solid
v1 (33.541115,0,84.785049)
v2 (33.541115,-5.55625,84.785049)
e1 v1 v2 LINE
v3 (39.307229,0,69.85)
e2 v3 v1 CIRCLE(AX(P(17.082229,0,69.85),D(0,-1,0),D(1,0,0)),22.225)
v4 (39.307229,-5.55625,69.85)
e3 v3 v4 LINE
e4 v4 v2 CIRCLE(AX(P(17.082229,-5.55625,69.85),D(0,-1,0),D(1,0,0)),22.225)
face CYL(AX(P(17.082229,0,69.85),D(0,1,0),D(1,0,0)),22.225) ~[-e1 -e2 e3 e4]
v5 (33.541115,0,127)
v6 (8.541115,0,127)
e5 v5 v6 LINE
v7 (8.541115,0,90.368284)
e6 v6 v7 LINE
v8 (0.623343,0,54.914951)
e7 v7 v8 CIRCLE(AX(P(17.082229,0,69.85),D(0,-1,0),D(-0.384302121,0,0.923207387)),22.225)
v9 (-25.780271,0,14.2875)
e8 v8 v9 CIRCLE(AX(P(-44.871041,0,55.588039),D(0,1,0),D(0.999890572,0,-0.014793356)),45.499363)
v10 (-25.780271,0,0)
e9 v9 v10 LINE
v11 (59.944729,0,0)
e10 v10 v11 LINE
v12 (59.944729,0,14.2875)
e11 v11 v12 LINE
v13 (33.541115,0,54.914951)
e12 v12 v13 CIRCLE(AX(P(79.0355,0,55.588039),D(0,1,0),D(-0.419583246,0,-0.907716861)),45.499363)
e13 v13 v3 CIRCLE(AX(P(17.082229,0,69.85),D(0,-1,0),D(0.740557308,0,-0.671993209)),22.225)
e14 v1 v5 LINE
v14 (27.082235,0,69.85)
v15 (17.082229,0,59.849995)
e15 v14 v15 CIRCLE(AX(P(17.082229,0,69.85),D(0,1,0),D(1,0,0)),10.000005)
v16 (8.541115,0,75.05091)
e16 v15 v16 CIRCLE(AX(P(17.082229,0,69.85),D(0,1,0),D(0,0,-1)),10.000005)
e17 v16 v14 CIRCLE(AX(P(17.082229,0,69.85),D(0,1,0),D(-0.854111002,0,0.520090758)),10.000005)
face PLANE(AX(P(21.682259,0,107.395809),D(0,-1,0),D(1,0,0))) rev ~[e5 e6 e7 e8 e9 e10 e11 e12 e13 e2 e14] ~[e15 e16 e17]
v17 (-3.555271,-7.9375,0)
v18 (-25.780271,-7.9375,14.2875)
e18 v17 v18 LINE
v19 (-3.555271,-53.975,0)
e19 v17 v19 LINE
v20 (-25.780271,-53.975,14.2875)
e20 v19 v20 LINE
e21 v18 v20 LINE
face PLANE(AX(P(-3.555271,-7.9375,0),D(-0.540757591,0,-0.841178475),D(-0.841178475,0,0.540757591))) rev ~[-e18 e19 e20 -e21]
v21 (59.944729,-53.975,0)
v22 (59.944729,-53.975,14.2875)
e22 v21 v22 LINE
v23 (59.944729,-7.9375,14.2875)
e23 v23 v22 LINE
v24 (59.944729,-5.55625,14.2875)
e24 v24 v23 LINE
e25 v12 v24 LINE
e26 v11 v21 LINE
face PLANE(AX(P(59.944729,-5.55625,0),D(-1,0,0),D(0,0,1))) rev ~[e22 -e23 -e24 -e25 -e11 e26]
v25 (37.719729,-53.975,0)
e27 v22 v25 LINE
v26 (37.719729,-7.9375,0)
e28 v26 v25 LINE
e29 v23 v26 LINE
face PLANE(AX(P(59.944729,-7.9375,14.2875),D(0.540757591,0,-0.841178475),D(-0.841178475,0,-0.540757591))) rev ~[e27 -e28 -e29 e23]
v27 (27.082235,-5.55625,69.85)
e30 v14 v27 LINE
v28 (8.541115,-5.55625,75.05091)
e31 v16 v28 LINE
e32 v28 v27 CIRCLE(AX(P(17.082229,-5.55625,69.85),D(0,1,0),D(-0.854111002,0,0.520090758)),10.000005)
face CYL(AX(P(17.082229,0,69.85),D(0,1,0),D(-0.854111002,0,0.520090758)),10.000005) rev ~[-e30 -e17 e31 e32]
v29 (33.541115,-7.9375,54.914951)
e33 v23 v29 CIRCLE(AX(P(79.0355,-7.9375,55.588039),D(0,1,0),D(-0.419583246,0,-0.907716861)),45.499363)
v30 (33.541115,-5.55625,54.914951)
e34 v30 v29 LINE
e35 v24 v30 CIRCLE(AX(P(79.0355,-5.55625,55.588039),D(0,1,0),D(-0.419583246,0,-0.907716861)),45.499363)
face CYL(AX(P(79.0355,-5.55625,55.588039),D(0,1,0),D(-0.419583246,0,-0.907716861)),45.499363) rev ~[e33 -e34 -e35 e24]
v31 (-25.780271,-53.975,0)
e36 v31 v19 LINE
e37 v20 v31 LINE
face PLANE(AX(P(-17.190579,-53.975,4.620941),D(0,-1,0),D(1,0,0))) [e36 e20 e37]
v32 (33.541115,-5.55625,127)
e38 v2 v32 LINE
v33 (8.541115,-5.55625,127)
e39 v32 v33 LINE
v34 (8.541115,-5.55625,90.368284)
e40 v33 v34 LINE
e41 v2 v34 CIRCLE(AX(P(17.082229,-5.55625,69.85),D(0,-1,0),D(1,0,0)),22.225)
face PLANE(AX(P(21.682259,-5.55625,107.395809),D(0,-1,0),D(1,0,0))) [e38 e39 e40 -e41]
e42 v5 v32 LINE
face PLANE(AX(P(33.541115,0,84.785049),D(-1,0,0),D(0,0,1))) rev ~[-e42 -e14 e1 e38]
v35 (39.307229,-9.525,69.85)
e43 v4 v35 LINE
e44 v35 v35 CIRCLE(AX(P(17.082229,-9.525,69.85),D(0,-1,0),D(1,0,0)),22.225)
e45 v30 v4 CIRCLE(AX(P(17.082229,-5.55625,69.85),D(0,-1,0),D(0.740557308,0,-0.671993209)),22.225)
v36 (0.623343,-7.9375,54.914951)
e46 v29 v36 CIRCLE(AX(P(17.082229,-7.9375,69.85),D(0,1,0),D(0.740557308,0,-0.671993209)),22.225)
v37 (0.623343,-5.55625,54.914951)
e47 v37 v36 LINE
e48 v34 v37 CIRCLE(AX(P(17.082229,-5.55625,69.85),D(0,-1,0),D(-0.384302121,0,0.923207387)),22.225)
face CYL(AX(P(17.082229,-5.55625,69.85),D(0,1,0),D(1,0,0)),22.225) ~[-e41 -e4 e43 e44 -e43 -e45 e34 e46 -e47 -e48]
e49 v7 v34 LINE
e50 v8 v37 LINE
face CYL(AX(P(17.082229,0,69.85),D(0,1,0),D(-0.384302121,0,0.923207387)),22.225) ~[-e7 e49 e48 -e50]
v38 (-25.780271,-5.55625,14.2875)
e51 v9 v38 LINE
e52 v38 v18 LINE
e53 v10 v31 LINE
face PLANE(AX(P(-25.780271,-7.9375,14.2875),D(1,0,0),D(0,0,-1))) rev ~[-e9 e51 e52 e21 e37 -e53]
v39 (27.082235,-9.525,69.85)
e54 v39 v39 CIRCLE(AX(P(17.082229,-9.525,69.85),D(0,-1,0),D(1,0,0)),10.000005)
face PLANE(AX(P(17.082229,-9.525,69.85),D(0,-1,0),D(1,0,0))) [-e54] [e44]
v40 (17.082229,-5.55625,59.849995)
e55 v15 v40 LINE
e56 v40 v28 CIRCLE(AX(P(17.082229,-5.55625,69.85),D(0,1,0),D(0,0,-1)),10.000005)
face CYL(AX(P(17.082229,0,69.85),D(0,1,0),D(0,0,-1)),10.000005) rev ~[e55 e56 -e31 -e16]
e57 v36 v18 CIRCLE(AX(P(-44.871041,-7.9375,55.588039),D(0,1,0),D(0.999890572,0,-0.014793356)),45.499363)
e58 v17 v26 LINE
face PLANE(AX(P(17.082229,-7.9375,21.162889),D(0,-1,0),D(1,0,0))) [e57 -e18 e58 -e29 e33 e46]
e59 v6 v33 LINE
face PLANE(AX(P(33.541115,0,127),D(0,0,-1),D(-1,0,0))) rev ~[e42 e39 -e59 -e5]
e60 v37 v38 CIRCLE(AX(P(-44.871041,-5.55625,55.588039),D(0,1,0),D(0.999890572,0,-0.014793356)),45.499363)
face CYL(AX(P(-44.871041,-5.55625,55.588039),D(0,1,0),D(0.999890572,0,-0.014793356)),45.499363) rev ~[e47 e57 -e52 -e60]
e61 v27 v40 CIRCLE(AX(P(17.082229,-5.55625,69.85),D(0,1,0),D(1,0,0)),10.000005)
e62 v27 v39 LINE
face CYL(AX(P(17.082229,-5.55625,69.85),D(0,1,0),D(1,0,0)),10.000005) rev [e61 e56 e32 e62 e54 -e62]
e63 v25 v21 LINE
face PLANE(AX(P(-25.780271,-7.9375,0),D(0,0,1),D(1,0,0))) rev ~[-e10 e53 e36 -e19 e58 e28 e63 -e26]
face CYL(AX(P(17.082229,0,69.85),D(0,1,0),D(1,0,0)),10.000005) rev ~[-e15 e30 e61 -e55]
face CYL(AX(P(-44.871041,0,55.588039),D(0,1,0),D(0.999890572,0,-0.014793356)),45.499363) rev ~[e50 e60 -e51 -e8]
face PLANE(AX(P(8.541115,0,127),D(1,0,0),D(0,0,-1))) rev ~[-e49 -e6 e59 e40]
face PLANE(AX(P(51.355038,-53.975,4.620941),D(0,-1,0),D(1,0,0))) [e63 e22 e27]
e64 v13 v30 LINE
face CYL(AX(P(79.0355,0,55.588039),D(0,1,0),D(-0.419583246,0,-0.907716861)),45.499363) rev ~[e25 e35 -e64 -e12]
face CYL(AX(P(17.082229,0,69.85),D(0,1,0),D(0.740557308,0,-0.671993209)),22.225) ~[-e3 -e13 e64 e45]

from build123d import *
from build123d import SkipClean  # not in build123d's __all__

# Parameters (mm, degrees)
F1_DEPTH = 5.55625
F2_R     = 22.225
F2_R_2   = 10.0000054
F3_DEPTH = 3.96875
F5_DEPTH = 2.38125
F7_DEPTH = 46.0375


# Not quite as in the source:
# - after a boolean that leaves OpenCascade's solid faulty, fix() repairs it


with BuildPart() as f1:
    # F0 (on Front) → F1 (new body)
    with BuildSketch(Plane.XZ):
        with BuildLine():
            ThreePointArc((8.5411146283, 90.3682841852), (21.9263912189, 91.5406597383), (33.5411154283, 84.7850490788))
            Line((33.5411154283, 84.7850490788), (33.5411154283, 127))
            Line((33.5411154283, 127), (8.5411146283, 127))
            Line((8.5411146283, 127), (8.5411146283, 90.3682841852))
        make_face()
        with BuildLine():
            ThreePointArc((17.0822292566, 47.625), (26.0827614415, 49.5290491023), (33.5411154283, 54.9149509212))
            Line((33.5411154283, 54.9149509212), (33.5411154283, 84.7850490788))
            ThreePointArc((33.5411154283, 84.7850490788), (21.9263912189, 91.5406597383), (8.5411146283, 90.3682841852))
            Line((8.5411146283, 90.3682841852), (8.5411146283, 75.050910392))
            ThreePointArc((8.5411146283, 75.050910392), (19.7830546485, 79.4783773401), (27.0822346566, 69.85))
            ThreePointArc((27.0822346566, 69.85), (24.1533008869, 62.7789283698), (17.0822292566, 59.8499946))
            Line((17.0822292566, 59.8499946), (17.0822292566, 47.625))
        make_face()
        with BuildLine():
            ThreePointArc((0.6233430849, 54.9149509212), (8.0816970717, 49.5290491023), (17.0822292566, 47.625))
            Line((17.0822292566, 47.625), (17.0822292566, 59.8499946))
            ThreePointArc((17.0822292566, 59.8499946), (8.3641663982, 64.9514810404), (8.5411146283, 75.050910392))
            Line((8.5411146283, 75.050910392), (8.5411146283, 90.3682841852))
            ThreePointArc((8.5411146283, 90.3682841852), (-4.6084304817, 74.6941619623), (0.6233430849, 54.9149509212))
        make_face()
        with BuildLine():
            Line((33.5411154283, 84.7850490788), (33.5411154283, 54.9149509212))
            ThreePointArc((33.5411154283, 54.9149509212), (37.8156487788, 61.8452551623), (39.3072292566, 69.85))
            ThreePointArc((39.3072292566, 69.85), (37.8156487788, 77.8547448377), (33.5411154283, 84.7850490788))
        make_face()
        with BuildLine():
            Line((17.0822292566, 0), (17.0822292566, 47.625))
            ThreePointArc((17.0822292566, 47.625), (8.0816970717, 49.5290491023), (0.6233430849, 54.9149509212))
            ThreePointArc((0.6233430849, 54.9149509212), (-6.7205760102, 30.7942081775), (-25.7802707434, 14.2875))
            Line((-25.7802707434, 14.2875), (-25.7802707434, 0))
            Line((-25.7802707434, 0), (17.0822292566, 0))
        make_face()
        with BuildLine():
            Line((33.5411154283, 0), (33.5411154283, 54.9149509212))
            ThreePointArc((33.5411154283, 54.9149509212), (26.0827614415, 49.5290491023), (17.0822292566, 47.625))
            Line((17.0822292566, 47.625), (17.0822292566, 0))
            Line((17.0822292566, 0), (33.5411154283, 0))
        make_face()
        with BuildLine():
            ThreePointArc((59.9447292566, 14.2875), (40.8850345234, 30.7942081775), (33.5411154283, 54.9149509212))
            Line((33.5411154283, 54.9149509212), (33.5411154283, 0))
            Line((33.5411154283, 0), (59.9447292566, 0))
            Line((59.9447292566, 0), (59.9447292566, 14.2875))
        make_face()
    extrude(amount=F1_DEPTH)

    # F2 (on face) → F3 (join)
    with BuildSketch(Plane.XZ.offset(5.55625)):
        with Locations((17.0822292566, 69.85)):
            Circle(F2_R)
        with Locations((17.0822292566, 69.85)):
            Circle(F2_R_2, mode=Mode.SUBTRACT)
    with SkipClean():  # cleaning this boolean's faces spoils the solid; the shape is the same uncleaned
        extrude(amount=F3_DEPTH)

    # F3_face (on face) + F4 (on face) → F5 (join)
    with BuildSketch(Plane(origin=(17.0822292566, -5.55625, 20.2916476737), x_dir=(1, 0, 0), z_dir=(0, -1, 0))):
        with BuildLine():
            ThreePointArc((16.4588861717, 34.6233032475), (0, 27.3333523263), (-16.4588861717, 34.6233032475))
            ThreePointArc((-16.4588861717, 34.6233032475), (-23.8028052668, 10.5025605039), (-42.8625, -6.0041476737))
            Line((-42.8625, -6.0041476737), (-42.8625, -20.2916476737))
            Line((-42.8625, -20.2916476737), (42.8625, -20.2916476737))
            Line((42.8625, -20.2916476737), (42.8625, -6.0041476737))
            ThreePointArc((42.8625, -6.0041476737), (23.8028052668, 10.5025605039), (16.4588861717, 34.6233032475))
        make_face()
    with BuildSketch(Plane.XZ.offset(5.55625)):
        with BuildLine():
            ThreePointArc((59.9447292566, 14.2875), (40.8850345234, 30.7942081775), (33.5411154283, 54.9149509212))
            ThreePointArc((33.5411154283, 54.9149509212), (17.0822292566, 47.625), (0.6233430849, 54.9149509212))
            ThreePointArc((0.6233430849, 54.9149509212), (-6.7205760102, 30.7942081775), (-25.7802707434, 14.2875))
            Line((-25.7802707434, 14.2875), (-25.7802707434, 0))
            Line((-25.7802707434, 0), (59.9447292566, 0))
            Line((59.9447292566, 0), (59.9447292566, 14.2875))
        make_face()
    extrude(amount=F5_DEPTH)

    add(f1.part.fix(), mode=Mode.REPLACE)

    # F6 (on face) → F7 (join)
    with BuildSketch(Plane.XZ.offset(7.9375)):
        Polygon((-25.7802707434, 14.2875), (-25.7802707434, 0), (-3.5552707434, 0), align=None)
        Polygon((59.9447292566, 14.2875), (37.7197292566, 0), (59.9447292566, 0), align=None)
    extrude(amount=F7_DEPTH)


solid = f1.part
